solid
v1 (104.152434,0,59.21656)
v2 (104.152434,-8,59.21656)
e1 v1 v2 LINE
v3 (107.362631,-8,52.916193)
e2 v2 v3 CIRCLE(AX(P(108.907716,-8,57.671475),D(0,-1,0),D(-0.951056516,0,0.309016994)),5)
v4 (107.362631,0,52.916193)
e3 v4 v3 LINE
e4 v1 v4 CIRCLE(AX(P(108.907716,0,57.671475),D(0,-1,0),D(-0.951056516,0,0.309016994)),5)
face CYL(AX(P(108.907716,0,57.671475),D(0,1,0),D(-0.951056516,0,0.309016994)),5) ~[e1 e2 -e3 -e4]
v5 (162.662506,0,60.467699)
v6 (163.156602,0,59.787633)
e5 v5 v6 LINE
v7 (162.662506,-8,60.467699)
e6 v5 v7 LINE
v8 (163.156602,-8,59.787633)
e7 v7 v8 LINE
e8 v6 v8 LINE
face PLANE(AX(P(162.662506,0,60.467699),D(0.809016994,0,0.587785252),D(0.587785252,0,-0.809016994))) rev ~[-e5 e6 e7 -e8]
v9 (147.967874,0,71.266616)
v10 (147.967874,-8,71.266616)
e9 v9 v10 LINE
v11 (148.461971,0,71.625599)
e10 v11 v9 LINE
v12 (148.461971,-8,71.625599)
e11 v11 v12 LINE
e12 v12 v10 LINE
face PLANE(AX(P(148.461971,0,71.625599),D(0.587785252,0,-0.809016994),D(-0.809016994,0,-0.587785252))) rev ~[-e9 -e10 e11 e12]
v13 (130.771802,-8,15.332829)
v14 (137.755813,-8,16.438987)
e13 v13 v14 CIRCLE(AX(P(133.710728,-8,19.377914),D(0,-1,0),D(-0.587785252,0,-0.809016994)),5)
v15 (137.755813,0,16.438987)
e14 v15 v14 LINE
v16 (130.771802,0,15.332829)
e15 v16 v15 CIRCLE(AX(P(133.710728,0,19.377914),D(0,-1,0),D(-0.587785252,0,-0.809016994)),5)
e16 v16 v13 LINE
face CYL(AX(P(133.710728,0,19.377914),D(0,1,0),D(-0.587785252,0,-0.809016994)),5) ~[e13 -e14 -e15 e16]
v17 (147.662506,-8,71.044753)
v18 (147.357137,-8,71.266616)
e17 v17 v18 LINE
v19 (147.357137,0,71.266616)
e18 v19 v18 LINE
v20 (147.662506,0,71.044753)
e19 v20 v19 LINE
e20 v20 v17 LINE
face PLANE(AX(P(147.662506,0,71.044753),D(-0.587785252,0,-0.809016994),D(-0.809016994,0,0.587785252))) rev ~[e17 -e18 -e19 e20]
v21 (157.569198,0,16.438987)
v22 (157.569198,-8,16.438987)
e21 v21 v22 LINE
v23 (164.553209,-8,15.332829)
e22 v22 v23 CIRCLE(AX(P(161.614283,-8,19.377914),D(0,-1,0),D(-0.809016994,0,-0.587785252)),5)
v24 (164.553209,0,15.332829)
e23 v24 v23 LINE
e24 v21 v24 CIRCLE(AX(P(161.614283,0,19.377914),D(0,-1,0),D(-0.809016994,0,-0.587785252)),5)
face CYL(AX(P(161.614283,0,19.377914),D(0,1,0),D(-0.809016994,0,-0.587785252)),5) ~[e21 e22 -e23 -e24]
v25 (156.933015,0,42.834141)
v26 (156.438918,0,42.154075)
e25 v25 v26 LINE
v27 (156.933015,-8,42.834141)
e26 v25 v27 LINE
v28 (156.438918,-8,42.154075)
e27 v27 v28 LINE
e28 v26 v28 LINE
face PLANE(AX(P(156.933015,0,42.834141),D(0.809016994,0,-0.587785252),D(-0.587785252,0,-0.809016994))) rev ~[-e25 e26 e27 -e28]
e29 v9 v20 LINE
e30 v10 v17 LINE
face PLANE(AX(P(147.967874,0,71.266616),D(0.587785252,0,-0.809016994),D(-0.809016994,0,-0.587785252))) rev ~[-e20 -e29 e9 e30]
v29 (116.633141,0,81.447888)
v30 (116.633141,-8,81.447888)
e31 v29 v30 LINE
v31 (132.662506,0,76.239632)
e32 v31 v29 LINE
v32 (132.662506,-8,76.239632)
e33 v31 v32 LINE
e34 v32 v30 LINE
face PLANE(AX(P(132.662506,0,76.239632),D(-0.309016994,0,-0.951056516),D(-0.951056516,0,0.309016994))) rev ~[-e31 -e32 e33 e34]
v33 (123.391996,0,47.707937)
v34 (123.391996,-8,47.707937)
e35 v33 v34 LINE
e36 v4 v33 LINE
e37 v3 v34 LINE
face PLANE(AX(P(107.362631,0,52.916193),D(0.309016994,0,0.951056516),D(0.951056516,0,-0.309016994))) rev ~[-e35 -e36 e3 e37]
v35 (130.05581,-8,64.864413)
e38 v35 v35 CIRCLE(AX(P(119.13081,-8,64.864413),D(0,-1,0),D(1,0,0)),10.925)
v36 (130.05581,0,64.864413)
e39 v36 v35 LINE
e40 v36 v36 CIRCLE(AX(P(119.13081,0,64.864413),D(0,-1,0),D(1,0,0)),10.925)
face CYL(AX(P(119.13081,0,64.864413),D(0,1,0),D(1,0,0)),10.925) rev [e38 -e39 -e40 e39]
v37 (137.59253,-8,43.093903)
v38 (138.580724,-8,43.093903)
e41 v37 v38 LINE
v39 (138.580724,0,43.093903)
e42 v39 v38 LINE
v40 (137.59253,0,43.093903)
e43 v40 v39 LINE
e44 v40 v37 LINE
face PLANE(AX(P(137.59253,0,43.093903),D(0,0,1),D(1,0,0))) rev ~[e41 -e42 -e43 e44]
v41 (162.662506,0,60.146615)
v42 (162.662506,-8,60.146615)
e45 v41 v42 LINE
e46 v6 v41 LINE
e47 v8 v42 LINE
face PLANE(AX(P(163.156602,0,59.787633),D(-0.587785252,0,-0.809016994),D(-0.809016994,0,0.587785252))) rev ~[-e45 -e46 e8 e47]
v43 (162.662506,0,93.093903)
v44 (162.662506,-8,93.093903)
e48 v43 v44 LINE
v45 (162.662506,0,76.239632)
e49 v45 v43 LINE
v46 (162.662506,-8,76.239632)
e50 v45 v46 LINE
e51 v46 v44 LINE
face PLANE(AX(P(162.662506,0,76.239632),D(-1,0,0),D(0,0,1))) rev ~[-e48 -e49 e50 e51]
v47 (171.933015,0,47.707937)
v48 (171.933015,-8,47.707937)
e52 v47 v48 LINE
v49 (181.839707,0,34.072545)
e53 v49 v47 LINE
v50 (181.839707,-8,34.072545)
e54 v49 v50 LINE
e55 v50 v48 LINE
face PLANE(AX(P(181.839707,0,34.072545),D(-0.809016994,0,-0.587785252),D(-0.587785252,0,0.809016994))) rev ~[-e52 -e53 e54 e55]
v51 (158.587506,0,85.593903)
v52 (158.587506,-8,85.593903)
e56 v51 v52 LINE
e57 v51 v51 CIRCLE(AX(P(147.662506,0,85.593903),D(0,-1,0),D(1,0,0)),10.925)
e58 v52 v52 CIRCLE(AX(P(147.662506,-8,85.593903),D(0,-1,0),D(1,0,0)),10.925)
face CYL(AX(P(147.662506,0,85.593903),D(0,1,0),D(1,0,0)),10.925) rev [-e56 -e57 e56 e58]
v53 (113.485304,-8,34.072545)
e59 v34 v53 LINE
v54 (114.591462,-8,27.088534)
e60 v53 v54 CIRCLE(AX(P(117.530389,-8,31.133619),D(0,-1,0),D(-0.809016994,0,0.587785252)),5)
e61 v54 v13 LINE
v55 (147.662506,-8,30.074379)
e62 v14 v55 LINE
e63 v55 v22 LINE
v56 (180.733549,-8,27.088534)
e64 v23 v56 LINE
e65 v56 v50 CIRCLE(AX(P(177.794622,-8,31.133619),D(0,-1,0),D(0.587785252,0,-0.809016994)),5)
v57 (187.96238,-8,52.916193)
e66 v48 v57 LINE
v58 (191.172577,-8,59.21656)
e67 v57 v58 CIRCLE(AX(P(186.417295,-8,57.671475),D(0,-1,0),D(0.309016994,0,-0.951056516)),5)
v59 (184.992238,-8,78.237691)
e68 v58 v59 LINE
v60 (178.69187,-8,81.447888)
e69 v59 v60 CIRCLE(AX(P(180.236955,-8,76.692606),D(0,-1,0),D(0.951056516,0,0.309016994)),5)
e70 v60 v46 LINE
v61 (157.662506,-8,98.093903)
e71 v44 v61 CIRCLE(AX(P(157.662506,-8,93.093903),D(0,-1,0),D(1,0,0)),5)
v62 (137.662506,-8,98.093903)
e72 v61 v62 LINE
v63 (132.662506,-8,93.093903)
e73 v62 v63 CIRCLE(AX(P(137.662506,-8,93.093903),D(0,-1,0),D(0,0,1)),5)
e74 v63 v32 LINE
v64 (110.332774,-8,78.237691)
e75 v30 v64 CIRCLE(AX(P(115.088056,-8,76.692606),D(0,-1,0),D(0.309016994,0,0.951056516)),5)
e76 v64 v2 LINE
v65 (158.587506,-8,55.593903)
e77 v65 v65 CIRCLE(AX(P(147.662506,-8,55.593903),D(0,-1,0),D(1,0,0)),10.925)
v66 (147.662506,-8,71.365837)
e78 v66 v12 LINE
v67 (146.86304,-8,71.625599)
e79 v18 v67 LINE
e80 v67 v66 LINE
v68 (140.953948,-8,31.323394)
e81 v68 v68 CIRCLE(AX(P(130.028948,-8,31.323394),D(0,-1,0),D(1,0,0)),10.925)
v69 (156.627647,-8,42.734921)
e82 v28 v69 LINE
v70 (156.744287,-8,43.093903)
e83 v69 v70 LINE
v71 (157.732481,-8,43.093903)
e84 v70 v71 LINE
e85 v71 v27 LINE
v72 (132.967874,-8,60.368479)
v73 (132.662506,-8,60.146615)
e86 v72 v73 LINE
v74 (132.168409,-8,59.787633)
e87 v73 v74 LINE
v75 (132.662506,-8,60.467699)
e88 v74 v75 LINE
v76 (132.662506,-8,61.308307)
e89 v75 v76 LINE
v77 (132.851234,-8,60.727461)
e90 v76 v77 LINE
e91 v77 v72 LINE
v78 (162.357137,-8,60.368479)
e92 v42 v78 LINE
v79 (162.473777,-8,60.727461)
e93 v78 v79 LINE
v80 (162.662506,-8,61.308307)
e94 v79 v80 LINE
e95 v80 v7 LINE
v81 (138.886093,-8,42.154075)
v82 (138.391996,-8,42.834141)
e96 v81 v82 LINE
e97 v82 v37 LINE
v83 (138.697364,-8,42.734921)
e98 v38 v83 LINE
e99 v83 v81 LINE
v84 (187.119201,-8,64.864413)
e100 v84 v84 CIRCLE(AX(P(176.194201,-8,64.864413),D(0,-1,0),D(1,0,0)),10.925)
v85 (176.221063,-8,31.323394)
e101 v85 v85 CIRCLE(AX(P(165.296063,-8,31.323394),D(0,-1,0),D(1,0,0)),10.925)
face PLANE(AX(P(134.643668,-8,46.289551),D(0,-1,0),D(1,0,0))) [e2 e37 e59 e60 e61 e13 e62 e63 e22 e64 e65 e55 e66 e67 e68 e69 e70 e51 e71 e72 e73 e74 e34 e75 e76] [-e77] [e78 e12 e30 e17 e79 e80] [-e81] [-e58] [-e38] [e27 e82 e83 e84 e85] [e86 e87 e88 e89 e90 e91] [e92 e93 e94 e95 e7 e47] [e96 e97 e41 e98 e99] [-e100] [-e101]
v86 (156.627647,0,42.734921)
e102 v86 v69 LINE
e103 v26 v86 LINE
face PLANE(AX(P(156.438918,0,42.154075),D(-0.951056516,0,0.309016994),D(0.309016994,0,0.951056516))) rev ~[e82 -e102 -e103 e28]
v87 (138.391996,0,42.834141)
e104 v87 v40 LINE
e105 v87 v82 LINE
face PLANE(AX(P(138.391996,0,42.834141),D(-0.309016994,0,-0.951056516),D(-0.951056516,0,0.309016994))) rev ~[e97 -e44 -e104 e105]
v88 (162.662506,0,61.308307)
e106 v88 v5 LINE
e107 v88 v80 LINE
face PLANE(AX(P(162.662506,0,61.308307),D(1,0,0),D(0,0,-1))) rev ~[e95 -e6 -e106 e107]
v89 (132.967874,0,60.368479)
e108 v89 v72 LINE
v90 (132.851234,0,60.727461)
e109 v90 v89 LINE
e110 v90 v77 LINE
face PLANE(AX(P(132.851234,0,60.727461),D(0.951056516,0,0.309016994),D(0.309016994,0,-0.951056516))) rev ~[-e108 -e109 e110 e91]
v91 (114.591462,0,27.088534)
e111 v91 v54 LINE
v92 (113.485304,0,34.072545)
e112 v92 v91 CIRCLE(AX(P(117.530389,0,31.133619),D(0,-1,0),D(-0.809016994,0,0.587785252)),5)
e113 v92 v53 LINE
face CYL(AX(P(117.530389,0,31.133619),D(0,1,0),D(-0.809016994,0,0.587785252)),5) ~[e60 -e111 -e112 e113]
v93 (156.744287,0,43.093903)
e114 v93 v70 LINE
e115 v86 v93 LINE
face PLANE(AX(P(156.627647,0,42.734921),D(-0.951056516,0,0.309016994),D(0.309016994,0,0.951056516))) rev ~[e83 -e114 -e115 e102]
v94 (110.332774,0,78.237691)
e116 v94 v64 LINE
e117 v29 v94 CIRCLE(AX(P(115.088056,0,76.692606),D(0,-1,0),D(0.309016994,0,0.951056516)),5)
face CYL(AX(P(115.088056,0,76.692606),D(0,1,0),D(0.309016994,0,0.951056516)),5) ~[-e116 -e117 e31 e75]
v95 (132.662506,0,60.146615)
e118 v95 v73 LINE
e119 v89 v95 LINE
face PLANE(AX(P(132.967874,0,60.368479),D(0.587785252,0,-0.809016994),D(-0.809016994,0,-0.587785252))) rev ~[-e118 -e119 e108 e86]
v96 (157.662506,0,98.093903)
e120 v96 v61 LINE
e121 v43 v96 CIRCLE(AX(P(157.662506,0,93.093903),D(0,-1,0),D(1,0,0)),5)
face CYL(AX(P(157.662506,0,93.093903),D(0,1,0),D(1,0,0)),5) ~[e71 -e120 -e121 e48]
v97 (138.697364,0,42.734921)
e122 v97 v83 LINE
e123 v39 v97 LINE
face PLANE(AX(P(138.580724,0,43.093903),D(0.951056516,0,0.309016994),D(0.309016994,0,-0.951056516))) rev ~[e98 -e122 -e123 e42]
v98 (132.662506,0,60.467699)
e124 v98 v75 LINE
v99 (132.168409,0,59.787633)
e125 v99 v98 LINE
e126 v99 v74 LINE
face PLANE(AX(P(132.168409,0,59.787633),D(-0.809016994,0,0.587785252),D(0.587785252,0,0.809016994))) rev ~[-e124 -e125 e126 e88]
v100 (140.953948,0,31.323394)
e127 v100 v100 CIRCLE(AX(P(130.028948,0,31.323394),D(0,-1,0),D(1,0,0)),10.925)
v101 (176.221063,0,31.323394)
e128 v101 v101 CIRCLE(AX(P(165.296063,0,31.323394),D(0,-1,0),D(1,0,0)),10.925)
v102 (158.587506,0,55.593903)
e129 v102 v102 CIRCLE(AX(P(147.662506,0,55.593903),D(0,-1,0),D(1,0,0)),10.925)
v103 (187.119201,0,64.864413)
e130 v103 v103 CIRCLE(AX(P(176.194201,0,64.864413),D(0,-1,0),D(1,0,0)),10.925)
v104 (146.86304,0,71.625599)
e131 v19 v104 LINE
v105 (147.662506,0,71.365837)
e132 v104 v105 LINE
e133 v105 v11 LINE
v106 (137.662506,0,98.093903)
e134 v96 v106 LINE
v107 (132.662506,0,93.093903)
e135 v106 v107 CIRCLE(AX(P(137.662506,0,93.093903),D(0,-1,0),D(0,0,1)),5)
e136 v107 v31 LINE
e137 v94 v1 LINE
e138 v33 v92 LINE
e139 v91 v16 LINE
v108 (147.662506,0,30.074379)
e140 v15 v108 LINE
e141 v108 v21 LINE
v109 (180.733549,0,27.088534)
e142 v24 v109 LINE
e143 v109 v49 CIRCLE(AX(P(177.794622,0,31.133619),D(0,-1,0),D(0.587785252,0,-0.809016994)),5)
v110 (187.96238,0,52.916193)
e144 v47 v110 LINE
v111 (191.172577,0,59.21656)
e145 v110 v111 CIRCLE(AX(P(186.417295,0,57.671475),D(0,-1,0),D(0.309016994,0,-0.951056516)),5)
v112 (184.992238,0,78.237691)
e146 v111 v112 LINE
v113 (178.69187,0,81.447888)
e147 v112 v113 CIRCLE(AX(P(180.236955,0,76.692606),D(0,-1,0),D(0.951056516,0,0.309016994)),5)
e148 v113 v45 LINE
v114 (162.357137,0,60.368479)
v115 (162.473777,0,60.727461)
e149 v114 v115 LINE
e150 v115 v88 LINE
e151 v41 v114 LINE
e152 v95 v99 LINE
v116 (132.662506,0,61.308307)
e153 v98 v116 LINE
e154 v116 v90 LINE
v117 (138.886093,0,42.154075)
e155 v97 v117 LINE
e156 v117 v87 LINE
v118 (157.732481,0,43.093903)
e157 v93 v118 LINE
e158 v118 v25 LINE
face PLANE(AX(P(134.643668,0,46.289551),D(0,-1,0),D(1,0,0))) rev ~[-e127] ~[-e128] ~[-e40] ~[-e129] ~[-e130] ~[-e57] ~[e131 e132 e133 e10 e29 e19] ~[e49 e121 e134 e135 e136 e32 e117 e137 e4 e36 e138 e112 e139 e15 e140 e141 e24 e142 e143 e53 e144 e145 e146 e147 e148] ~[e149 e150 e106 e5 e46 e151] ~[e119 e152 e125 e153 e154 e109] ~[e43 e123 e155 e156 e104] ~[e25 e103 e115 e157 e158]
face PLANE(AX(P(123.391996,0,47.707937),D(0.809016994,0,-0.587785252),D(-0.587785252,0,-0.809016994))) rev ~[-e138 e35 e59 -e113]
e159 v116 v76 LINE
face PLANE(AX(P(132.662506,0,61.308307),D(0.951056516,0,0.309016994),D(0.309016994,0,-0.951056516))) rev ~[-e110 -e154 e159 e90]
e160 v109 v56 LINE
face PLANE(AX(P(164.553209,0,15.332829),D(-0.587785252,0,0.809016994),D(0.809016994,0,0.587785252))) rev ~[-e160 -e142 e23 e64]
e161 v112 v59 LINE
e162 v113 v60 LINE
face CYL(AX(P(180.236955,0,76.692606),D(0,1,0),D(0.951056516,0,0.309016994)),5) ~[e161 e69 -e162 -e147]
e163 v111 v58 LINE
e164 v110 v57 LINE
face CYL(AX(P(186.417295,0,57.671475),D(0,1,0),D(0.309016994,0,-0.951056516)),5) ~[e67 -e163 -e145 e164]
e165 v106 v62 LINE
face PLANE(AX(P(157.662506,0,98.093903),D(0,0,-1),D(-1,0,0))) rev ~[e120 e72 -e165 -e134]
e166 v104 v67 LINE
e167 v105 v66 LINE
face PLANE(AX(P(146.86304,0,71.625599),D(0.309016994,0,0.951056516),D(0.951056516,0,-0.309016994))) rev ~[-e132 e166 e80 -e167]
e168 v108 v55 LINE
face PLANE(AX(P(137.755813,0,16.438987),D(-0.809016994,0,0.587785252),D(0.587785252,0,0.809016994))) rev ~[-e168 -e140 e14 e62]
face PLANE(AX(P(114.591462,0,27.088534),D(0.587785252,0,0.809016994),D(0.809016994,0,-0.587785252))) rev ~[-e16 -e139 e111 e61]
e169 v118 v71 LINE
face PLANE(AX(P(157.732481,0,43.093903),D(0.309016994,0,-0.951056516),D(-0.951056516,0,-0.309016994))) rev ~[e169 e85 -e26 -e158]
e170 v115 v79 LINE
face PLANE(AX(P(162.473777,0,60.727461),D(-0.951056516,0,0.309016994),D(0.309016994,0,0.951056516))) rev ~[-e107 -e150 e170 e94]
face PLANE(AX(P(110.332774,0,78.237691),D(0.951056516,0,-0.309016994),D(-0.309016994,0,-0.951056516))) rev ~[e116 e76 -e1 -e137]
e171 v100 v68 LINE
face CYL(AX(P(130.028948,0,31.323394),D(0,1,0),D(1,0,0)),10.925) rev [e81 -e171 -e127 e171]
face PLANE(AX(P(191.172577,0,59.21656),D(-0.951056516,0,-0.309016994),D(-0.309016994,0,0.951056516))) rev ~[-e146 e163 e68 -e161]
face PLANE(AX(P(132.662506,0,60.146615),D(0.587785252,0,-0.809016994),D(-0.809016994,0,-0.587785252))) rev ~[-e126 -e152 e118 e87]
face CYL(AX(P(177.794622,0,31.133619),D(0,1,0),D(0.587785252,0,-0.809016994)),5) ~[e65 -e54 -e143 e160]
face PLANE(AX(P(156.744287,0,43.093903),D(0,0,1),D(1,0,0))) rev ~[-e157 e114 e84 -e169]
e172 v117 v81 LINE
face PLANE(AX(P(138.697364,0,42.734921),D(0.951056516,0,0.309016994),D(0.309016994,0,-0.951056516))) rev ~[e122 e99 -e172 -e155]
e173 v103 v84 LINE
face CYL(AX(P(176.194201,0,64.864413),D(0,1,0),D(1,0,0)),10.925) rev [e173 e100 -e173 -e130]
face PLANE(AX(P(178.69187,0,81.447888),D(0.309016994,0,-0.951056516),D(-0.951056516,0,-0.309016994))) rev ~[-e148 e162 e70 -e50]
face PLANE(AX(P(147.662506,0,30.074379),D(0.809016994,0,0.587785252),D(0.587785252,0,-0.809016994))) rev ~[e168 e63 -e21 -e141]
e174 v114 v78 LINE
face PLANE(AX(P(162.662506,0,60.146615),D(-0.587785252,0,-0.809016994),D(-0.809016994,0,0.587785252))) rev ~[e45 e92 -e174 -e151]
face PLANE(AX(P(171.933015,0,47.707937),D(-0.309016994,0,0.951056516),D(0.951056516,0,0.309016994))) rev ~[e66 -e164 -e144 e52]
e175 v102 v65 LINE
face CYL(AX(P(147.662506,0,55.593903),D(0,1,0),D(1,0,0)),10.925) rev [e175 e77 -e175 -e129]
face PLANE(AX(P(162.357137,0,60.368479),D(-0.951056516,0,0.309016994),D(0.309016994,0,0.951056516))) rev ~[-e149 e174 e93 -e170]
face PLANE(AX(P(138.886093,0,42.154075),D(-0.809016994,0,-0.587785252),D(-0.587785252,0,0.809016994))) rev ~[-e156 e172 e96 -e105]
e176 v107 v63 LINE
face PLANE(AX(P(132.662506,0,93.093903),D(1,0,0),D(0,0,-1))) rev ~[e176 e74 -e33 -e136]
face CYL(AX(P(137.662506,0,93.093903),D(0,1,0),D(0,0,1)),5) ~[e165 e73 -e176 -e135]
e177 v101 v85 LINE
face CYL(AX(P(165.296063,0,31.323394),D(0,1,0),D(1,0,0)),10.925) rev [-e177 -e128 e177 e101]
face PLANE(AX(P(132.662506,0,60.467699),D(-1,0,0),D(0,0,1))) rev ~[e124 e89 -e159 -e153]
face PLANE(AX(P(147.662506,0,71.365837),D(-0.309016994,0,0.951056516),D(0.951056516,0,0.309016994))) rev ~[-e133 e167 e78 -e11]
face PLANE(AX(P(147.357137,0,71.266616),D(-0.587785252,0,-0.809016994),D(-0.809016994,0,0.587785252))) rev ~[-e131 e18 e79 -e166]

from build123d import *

# Parameters (mm, degrees)
F0_R     = 10.925
F1_DEPTH = 8


with BuildPart() as f1:
    # F0 (on Front) → F1 (new body)
    with BuildSketch(Plane.XZ):
        Polygon((137.5925300597, 43.0939033628), (138.203267445, 43.0939033628), (132.6625055075, 50.7201079193), (132.6625055075, 44.6957654427), align=None)
        Polygon((132.6625055075, 66.4920412828), (138.3919956762, 68.353665488), (141.9330153387, 73.2274609315), (132.6625055075, 76.2396321698), align=None)
        with BuildLine():
            Line((152.4504447694, 74.5233945768), (153.3919956762, 73.2274609315))
            Line((153.3919956762, 73.2274609315), (162.6625055075, 76.2396321698))
            Line((162.6625055075, 76.2396321698), (162.6625055075, 93.0939033628))
            ThreePointArc((162.6625055075, 93.0939033628), (161.1980394134, 96.6294372687), (157.6625055075, 98.0939033628))
            Line((157.6625055075, 98.0939033628), (137.6625055075, 98.0939033628))
            ThreePointArc((137.6625055075, 98.0939033628), (134.1269716015, 96.6294372687), (132.6625055075, 93.0939033628))
            Line((132.6625055075, 93.0939033628), (132.6625055075, 76.2396321698))
            Line((132.6625055075, 76.2396321698), (141.9330153387, 73.2274609315))
            Line((141.9330153387, 73.2274609315), (142.8745662455, 74.5233945768))
            Line((142.8745662455, 74.5233945768), (146.8630398909, 71.6255988516))
            Line((146.8630398909, 71.6255988516), (147.6625055075, 71.3658367263))
            Line((147.6625055075, 71.3658367263), (148.461971124, 71.6255988516))
            Line((148.461971124, 71.6255988516), (152.4504447694, 74.5233945768))
        make_face()
        with Locations((147.6625055075, 85.5939033628)):
            Circle(F0_R, mode=Mode.SUBTRACT)
        Polygon((153.3919956762, 73.2274609315), (156.9330153387, 68.353665488), (162.6625055075, 66.4920412828), (162.6625055075, 76.2396321698), align=None)
        Polygon((147.9678742002, 71.2666164235), (156.9330153387, 68.353665488), (153.3919956762, 73.2274609315), (148.461971124, 71.6255988516), align=None)
        Polygon((138.5807239074, 43.0939033628), (156.7442871075, 43.0939033628), (162.3571368148, 60.3684785034), (147.6625055075, 71.0447530815), (132.9678742002, 60.3684785034), align=None)
        with Locations((147.6625055075, 55.5939033628)):
            Circle(F0_R, mode=Mode.SUBTRACT)
        Polygon((147.6625055075, 30.0743791122), (153.3919956762, 37.960345794), (147.6625055075, 39.8219699992), (141.9330153387, 37.960345794), align=None)
        with BuildLine():
            Line((137.7558134621, 16.4389872893), (147.6625055075, 30.0743791122))
            Line((147.6625055075, 30.0743791122), (141.9330153387, 37.960345794))
            Line((141.9330153387, 37.960345794), (140.4095539694, 37.4653431886))
            Line((140.4095539694, 37.4653431886), (138.8860926001, 42.1540751645))
            Line((138.8860926001, 42.1540751645), (138.3919956762, 42.8341412375))
            Line((138.3919956762, 42.8341412375), (137.5925300597, 43.0939033628))
            Line((137.5925300597, 43.0939033628), (132.6625055075, 43.0939033628))
            Line((132.6625055075, 43.0939033628), (132.6625055075, 44.6957654427))
            Line((132.6625055075, 44.6957654427), (123.3919956762, 47.707936681))
            Line((123.3919956762, 47.707936681), (113.4853036309, 34.0725448581))
            ThreePointArc((113.4853036309, 34.0725448581), (112.5919468998, 30.3514462714), (114.5914623413, 27.0885336247))
            Line((114.5914623413, 27.0885336247), (130.7718022288, 15.3328285789))
            ThreePointArc((130.7718022288, 15.3328285789), (134.4929008155, 14.4394718478), (137.7558134621, 16.4389872893))
        make_face()
        with Locations((130.0289479387, 31.3233935315)):
            Circle(F0_R, mode=Mode.SUBTRACT)
        with BuildLine():
            Line((162.6625055075, 44.6957654427), (162.6625055075, 43.0939033628))
            Line((162.6625055075, 43.0939033628), (157.7324809553, 43.0939033628))
            Line((157.7324809553, 43.0939033628), (156.9330153387, 42.8341412375))
            Line((156.9330153387, 42.8341412375), (156.4389184148, 42.1540751645))
            Line((156.4389184148, 42.1540751645), (154.9154570455, 37.4653431886))
            Line((154.9154570455, 37.4653431886), (153.3919956762, 37.960345794))
            Line((153.3919956762, 37.960345794), (147.6625055075, 30.0743791122))
            Line((147.6625055075, 30.0743791122), (157.5691975528, 16.4389872893))
            ThreePointArc((157.5691975528, 16.4389872893), (160.8321101995, 14.4394718478), (164.5532087862, 15.3328285789))
            Line((164.5532087861, 15.3328285789), (180.7335486736, 27.0885336247))
            ThreePointArc((180.7335486736, 27.0885336247), (182.7330641152, 30.3514462714), (181.8397073841, 34.0725448581))
            Line((181.8397073841, 34.0725448581), (171.9330153387, 47.707936681))
            Line((171.9330153387, 47.707936681), (162.6625055075, 44.6957654427))
        make_face()
        with Locations((165.2960630762, 31.3233935315)):
            Circle(F0_R, mode=Mode.SUBTRACT)
        with BuildLine():
            Line((166.20352517, 55.5939033628), (171.9330153387, 47.707936681))
            Line((171.9330153387, 47.707936681), (187.9623797842, 52.9161929074))
            ThreePointArc((187.9623797842, 52.9161929074), (190.8723274332, 55.4015229902), (191.1725773938, 59.2165604607))
            Line((191.1725773938, 59.2165604607), (184.9922375063, 78.2376907866))
            ThreePointArc((184.9922375063, 78.2376907866), (182.5069074235, 81.1476384357), (178.6918699529, 81.4478883962))
            Line((178.6918699529, 81.4478883962), (162.6625055075, 76.2396321698))
            Line((162.6625055075, 76.2396321698), (162.6625055075, 66.4920412828))
            Line((162.6625055075, 66.4920412828), (164.1859668768, 65.9970386775))
            Line((164.1859668768, 65.9970386775), (162.6625055075, 61.3083067016))
            Line((162.6625055075, 61.3083067016), (162.6625055075, 60.4676988062))
            Line((162.6625055075, 60.4676988062), (163.1566024313, 59.7876327333))
            Line((163.1566024313, 59.7876327333), (167.1450760767, 56.8898370081))
            Line((167.1450760767, 56.8898370081), (166.20352517, 55.5939033628))
        make_face()
        with Locations((176.1942009963, 64.864413194)):
            Circle(F0_R, mode=Mode.SUBTRACT)
        Polygon((162.6625055075, 50.7201079193), (162.6625055075, 44.6957654427), (171.9330153387, 47.707936681), (166.20352517, 55.5939033628), align=None)
        Polygon((162.6625055075, 60.1466151614), (162.6625055075, 50.7201079193), (166.20352517, 55.5939033628), (163.1566024313, 59.7876327333), align=None)
        Polygon((163.1566024313, 59.7876327333), (166.20352517, 55.5939033628), (167.1450760767, 56.8898370081), align=None)
        Polygon((156.7442871075, 43.0939033628), (157.1217435699, 43.0939033628), (162.6625055075, 50.7201079193), (162.6625055075, 60.1466151614), (162.3571368148, 60.3684785034), align=None)
        Polygon((157.1217435699, 43.0939033628), (157.7324809553, 43.0939033628), (162.6625055075, 44.6957654427), (162.6625055075, 50.7201079193), align=None)
        Polygon((157.7324809553, 43.0939033628), (162.6625055075, 43.0939033628), (162.6625055075, 44.6957654427), align=None)
        Polygon((154.9154570455, 37.4653431886), (156.4389184148, 42.1540751645), (153.3919956762, 37.960345794), align=None)
        Polygon((153.3919956762, 37.960345794), (156.4389184148, 42.1540751645), (156.627646646, 42.7349209346), (147.6625055075, 39.8219699992), align=None)
        Polygon((156.627646646, 42.7349209346), (156.7442871075, 43.0939033628), (138.5807239074, 43.0939033628), (138.6973643689, 42.7349209346), (147.6625055075, 39.8219699992), align=None)
        Polygon((141.9330153387, 37.960345794), (147.6625055075, 39.8219699992), (138.6973643689, 42.7349209346), (138.8860926001, 42.1540751645), align=None)
        Polygon((140.4095539694, 37.4653431886), (141.9330153387, 37.960345794), (138.8860926001, 42.1540751645), align=None)
        Polygon((138.203267445, 43.0939033628), (138.5807239074, 43.0939033628), (132.9678742002, 60.3684785034), (132.6625055075, 60.1466151614), (132.6625055075, 50.7201079193), align=None)
        Polygon((132.6625055075, 43.0939033628), (137.5925300597, 43.0939033628), (132.6625055075, 44.6957654427), align=None)
        Polygon((132.6625055075, 44.6957654427), (132.6625055075, 50.7201079193), (129.121485845, 55.5939033628), (123.3919956762, 47.707936681), align=None)
        Polygon((129.121485845, 55.5939033628), (132.6625055075, 50.7201079193), (132.6625055075, 60.1466151614), (132.1684085836, 59.7876327333), align=None)
        Polygon((128.1799349382, 56.8898370081), (129.121485845, 55.5939033628), (132.1684085836, 59.7876327333), align=None)
        Polygon((132.6625055075, 61.3083067016), (132.8512337387, 60.7274609315), (138.3919956762, 68.353665488), (132.6625055075, 66.4920412828), align=None)
        Polygon((131.1390441382, 65.9970386775), (132.6625055075, 61.3083067016), (132.6625055075, 66.4920412828), align=None)
        Polygon((132.8512337387, 60.7274609315), (132.9678742002, 60.3684785034), (147.6625055075, 71.0447530815), (147.3571368148, 71.2666164235), (138.3919956762, 68.353665488), align=None)
        Polygon((141.9330153387, 73.2274609315), (146.8630398909, 71.6255988516), (142.8745662455, 74.5233945768), align=None)
        Polygon((138.3919956762, 68.353665488), (147.3571368148, 71.2666164235), (146.8630398909, 71.6255988516), (141.9330153387, 73.2274609315), align=None)
        Polygon((147.6625055075, 71.0447530815), (162.3571368148, 60.3684785034), (162.4737772763, 60.7274609315), (156.9330153387, 68.353665488), (147.9678742002, 71.2666164235), align=None)
        Polygon((156.9330153387, 68.353665488), (162.4737772763, 60.7274609315), (162.6625055075, 61.3083067016), (162.6625055075, 66.4920412828), align=None)
        Polygon((162.6625055075, 66.4920412828), (162.6625055075, 61.3083067016), (164.1859668768, 65.9970386775), align=None)
        Polygon((148.461971124, 71.6255988516), (153.3919956762, 73.2274609315), (152.4504447694, 74.5233945768), align=None)
        with BuildLine():
            Line((123.3919956762, 47.707936681), (129.121485845, 55.5939033628))
            Line((129.121485845, 55.5939033628), (128.1799349382, 56.8898370081))
            Line((128.1799349382, 56.8898370081), (132.1684085836, 59.7876327333))
            Line((132.1684085836, 59.7876327333), (132.6625055075, 60.4676988062))
            Line((132.6625055075, 60.4676988062), (132.6625055075, 61.3083067016))
            Line((132.6625055075, 61.3083067016), (131.1390441382, 65.9970386775))
            Line((131.1390441382, 65.9970386775), (132.6625055075, 66.4920412828))
            Line((132.6625055075, 66.4920412828), (132.6625055075, 76.2396321698))
            Line((132.6625055075, 76.2396321698), (116.633141062, 81.4478883962))
            ThreePointArc((116.633141062, 81.4478883962), (112.8181035915, 81.1476384357), (110.3327735087, 78.2376907866))
            Line((110.3327735087, 78.2376907866), (104.1524336212, 59.2165604607))
            ThreePointArc((104.1524336212, 59.2165604607), (104.4526835817, 55.4015229902), (107.3626312308, 52.9161929074))
            Line((107.3626312308, 52.9161929074), (123.3919956762, 47.707936681))
        make_face()
        with Locations((119.1308100186, 64.864413194)):
            Circle(F0_R, mode=Mode.SUBTRACT)
    extrude(amount=F1_DEPTH)


solid = f1.part
